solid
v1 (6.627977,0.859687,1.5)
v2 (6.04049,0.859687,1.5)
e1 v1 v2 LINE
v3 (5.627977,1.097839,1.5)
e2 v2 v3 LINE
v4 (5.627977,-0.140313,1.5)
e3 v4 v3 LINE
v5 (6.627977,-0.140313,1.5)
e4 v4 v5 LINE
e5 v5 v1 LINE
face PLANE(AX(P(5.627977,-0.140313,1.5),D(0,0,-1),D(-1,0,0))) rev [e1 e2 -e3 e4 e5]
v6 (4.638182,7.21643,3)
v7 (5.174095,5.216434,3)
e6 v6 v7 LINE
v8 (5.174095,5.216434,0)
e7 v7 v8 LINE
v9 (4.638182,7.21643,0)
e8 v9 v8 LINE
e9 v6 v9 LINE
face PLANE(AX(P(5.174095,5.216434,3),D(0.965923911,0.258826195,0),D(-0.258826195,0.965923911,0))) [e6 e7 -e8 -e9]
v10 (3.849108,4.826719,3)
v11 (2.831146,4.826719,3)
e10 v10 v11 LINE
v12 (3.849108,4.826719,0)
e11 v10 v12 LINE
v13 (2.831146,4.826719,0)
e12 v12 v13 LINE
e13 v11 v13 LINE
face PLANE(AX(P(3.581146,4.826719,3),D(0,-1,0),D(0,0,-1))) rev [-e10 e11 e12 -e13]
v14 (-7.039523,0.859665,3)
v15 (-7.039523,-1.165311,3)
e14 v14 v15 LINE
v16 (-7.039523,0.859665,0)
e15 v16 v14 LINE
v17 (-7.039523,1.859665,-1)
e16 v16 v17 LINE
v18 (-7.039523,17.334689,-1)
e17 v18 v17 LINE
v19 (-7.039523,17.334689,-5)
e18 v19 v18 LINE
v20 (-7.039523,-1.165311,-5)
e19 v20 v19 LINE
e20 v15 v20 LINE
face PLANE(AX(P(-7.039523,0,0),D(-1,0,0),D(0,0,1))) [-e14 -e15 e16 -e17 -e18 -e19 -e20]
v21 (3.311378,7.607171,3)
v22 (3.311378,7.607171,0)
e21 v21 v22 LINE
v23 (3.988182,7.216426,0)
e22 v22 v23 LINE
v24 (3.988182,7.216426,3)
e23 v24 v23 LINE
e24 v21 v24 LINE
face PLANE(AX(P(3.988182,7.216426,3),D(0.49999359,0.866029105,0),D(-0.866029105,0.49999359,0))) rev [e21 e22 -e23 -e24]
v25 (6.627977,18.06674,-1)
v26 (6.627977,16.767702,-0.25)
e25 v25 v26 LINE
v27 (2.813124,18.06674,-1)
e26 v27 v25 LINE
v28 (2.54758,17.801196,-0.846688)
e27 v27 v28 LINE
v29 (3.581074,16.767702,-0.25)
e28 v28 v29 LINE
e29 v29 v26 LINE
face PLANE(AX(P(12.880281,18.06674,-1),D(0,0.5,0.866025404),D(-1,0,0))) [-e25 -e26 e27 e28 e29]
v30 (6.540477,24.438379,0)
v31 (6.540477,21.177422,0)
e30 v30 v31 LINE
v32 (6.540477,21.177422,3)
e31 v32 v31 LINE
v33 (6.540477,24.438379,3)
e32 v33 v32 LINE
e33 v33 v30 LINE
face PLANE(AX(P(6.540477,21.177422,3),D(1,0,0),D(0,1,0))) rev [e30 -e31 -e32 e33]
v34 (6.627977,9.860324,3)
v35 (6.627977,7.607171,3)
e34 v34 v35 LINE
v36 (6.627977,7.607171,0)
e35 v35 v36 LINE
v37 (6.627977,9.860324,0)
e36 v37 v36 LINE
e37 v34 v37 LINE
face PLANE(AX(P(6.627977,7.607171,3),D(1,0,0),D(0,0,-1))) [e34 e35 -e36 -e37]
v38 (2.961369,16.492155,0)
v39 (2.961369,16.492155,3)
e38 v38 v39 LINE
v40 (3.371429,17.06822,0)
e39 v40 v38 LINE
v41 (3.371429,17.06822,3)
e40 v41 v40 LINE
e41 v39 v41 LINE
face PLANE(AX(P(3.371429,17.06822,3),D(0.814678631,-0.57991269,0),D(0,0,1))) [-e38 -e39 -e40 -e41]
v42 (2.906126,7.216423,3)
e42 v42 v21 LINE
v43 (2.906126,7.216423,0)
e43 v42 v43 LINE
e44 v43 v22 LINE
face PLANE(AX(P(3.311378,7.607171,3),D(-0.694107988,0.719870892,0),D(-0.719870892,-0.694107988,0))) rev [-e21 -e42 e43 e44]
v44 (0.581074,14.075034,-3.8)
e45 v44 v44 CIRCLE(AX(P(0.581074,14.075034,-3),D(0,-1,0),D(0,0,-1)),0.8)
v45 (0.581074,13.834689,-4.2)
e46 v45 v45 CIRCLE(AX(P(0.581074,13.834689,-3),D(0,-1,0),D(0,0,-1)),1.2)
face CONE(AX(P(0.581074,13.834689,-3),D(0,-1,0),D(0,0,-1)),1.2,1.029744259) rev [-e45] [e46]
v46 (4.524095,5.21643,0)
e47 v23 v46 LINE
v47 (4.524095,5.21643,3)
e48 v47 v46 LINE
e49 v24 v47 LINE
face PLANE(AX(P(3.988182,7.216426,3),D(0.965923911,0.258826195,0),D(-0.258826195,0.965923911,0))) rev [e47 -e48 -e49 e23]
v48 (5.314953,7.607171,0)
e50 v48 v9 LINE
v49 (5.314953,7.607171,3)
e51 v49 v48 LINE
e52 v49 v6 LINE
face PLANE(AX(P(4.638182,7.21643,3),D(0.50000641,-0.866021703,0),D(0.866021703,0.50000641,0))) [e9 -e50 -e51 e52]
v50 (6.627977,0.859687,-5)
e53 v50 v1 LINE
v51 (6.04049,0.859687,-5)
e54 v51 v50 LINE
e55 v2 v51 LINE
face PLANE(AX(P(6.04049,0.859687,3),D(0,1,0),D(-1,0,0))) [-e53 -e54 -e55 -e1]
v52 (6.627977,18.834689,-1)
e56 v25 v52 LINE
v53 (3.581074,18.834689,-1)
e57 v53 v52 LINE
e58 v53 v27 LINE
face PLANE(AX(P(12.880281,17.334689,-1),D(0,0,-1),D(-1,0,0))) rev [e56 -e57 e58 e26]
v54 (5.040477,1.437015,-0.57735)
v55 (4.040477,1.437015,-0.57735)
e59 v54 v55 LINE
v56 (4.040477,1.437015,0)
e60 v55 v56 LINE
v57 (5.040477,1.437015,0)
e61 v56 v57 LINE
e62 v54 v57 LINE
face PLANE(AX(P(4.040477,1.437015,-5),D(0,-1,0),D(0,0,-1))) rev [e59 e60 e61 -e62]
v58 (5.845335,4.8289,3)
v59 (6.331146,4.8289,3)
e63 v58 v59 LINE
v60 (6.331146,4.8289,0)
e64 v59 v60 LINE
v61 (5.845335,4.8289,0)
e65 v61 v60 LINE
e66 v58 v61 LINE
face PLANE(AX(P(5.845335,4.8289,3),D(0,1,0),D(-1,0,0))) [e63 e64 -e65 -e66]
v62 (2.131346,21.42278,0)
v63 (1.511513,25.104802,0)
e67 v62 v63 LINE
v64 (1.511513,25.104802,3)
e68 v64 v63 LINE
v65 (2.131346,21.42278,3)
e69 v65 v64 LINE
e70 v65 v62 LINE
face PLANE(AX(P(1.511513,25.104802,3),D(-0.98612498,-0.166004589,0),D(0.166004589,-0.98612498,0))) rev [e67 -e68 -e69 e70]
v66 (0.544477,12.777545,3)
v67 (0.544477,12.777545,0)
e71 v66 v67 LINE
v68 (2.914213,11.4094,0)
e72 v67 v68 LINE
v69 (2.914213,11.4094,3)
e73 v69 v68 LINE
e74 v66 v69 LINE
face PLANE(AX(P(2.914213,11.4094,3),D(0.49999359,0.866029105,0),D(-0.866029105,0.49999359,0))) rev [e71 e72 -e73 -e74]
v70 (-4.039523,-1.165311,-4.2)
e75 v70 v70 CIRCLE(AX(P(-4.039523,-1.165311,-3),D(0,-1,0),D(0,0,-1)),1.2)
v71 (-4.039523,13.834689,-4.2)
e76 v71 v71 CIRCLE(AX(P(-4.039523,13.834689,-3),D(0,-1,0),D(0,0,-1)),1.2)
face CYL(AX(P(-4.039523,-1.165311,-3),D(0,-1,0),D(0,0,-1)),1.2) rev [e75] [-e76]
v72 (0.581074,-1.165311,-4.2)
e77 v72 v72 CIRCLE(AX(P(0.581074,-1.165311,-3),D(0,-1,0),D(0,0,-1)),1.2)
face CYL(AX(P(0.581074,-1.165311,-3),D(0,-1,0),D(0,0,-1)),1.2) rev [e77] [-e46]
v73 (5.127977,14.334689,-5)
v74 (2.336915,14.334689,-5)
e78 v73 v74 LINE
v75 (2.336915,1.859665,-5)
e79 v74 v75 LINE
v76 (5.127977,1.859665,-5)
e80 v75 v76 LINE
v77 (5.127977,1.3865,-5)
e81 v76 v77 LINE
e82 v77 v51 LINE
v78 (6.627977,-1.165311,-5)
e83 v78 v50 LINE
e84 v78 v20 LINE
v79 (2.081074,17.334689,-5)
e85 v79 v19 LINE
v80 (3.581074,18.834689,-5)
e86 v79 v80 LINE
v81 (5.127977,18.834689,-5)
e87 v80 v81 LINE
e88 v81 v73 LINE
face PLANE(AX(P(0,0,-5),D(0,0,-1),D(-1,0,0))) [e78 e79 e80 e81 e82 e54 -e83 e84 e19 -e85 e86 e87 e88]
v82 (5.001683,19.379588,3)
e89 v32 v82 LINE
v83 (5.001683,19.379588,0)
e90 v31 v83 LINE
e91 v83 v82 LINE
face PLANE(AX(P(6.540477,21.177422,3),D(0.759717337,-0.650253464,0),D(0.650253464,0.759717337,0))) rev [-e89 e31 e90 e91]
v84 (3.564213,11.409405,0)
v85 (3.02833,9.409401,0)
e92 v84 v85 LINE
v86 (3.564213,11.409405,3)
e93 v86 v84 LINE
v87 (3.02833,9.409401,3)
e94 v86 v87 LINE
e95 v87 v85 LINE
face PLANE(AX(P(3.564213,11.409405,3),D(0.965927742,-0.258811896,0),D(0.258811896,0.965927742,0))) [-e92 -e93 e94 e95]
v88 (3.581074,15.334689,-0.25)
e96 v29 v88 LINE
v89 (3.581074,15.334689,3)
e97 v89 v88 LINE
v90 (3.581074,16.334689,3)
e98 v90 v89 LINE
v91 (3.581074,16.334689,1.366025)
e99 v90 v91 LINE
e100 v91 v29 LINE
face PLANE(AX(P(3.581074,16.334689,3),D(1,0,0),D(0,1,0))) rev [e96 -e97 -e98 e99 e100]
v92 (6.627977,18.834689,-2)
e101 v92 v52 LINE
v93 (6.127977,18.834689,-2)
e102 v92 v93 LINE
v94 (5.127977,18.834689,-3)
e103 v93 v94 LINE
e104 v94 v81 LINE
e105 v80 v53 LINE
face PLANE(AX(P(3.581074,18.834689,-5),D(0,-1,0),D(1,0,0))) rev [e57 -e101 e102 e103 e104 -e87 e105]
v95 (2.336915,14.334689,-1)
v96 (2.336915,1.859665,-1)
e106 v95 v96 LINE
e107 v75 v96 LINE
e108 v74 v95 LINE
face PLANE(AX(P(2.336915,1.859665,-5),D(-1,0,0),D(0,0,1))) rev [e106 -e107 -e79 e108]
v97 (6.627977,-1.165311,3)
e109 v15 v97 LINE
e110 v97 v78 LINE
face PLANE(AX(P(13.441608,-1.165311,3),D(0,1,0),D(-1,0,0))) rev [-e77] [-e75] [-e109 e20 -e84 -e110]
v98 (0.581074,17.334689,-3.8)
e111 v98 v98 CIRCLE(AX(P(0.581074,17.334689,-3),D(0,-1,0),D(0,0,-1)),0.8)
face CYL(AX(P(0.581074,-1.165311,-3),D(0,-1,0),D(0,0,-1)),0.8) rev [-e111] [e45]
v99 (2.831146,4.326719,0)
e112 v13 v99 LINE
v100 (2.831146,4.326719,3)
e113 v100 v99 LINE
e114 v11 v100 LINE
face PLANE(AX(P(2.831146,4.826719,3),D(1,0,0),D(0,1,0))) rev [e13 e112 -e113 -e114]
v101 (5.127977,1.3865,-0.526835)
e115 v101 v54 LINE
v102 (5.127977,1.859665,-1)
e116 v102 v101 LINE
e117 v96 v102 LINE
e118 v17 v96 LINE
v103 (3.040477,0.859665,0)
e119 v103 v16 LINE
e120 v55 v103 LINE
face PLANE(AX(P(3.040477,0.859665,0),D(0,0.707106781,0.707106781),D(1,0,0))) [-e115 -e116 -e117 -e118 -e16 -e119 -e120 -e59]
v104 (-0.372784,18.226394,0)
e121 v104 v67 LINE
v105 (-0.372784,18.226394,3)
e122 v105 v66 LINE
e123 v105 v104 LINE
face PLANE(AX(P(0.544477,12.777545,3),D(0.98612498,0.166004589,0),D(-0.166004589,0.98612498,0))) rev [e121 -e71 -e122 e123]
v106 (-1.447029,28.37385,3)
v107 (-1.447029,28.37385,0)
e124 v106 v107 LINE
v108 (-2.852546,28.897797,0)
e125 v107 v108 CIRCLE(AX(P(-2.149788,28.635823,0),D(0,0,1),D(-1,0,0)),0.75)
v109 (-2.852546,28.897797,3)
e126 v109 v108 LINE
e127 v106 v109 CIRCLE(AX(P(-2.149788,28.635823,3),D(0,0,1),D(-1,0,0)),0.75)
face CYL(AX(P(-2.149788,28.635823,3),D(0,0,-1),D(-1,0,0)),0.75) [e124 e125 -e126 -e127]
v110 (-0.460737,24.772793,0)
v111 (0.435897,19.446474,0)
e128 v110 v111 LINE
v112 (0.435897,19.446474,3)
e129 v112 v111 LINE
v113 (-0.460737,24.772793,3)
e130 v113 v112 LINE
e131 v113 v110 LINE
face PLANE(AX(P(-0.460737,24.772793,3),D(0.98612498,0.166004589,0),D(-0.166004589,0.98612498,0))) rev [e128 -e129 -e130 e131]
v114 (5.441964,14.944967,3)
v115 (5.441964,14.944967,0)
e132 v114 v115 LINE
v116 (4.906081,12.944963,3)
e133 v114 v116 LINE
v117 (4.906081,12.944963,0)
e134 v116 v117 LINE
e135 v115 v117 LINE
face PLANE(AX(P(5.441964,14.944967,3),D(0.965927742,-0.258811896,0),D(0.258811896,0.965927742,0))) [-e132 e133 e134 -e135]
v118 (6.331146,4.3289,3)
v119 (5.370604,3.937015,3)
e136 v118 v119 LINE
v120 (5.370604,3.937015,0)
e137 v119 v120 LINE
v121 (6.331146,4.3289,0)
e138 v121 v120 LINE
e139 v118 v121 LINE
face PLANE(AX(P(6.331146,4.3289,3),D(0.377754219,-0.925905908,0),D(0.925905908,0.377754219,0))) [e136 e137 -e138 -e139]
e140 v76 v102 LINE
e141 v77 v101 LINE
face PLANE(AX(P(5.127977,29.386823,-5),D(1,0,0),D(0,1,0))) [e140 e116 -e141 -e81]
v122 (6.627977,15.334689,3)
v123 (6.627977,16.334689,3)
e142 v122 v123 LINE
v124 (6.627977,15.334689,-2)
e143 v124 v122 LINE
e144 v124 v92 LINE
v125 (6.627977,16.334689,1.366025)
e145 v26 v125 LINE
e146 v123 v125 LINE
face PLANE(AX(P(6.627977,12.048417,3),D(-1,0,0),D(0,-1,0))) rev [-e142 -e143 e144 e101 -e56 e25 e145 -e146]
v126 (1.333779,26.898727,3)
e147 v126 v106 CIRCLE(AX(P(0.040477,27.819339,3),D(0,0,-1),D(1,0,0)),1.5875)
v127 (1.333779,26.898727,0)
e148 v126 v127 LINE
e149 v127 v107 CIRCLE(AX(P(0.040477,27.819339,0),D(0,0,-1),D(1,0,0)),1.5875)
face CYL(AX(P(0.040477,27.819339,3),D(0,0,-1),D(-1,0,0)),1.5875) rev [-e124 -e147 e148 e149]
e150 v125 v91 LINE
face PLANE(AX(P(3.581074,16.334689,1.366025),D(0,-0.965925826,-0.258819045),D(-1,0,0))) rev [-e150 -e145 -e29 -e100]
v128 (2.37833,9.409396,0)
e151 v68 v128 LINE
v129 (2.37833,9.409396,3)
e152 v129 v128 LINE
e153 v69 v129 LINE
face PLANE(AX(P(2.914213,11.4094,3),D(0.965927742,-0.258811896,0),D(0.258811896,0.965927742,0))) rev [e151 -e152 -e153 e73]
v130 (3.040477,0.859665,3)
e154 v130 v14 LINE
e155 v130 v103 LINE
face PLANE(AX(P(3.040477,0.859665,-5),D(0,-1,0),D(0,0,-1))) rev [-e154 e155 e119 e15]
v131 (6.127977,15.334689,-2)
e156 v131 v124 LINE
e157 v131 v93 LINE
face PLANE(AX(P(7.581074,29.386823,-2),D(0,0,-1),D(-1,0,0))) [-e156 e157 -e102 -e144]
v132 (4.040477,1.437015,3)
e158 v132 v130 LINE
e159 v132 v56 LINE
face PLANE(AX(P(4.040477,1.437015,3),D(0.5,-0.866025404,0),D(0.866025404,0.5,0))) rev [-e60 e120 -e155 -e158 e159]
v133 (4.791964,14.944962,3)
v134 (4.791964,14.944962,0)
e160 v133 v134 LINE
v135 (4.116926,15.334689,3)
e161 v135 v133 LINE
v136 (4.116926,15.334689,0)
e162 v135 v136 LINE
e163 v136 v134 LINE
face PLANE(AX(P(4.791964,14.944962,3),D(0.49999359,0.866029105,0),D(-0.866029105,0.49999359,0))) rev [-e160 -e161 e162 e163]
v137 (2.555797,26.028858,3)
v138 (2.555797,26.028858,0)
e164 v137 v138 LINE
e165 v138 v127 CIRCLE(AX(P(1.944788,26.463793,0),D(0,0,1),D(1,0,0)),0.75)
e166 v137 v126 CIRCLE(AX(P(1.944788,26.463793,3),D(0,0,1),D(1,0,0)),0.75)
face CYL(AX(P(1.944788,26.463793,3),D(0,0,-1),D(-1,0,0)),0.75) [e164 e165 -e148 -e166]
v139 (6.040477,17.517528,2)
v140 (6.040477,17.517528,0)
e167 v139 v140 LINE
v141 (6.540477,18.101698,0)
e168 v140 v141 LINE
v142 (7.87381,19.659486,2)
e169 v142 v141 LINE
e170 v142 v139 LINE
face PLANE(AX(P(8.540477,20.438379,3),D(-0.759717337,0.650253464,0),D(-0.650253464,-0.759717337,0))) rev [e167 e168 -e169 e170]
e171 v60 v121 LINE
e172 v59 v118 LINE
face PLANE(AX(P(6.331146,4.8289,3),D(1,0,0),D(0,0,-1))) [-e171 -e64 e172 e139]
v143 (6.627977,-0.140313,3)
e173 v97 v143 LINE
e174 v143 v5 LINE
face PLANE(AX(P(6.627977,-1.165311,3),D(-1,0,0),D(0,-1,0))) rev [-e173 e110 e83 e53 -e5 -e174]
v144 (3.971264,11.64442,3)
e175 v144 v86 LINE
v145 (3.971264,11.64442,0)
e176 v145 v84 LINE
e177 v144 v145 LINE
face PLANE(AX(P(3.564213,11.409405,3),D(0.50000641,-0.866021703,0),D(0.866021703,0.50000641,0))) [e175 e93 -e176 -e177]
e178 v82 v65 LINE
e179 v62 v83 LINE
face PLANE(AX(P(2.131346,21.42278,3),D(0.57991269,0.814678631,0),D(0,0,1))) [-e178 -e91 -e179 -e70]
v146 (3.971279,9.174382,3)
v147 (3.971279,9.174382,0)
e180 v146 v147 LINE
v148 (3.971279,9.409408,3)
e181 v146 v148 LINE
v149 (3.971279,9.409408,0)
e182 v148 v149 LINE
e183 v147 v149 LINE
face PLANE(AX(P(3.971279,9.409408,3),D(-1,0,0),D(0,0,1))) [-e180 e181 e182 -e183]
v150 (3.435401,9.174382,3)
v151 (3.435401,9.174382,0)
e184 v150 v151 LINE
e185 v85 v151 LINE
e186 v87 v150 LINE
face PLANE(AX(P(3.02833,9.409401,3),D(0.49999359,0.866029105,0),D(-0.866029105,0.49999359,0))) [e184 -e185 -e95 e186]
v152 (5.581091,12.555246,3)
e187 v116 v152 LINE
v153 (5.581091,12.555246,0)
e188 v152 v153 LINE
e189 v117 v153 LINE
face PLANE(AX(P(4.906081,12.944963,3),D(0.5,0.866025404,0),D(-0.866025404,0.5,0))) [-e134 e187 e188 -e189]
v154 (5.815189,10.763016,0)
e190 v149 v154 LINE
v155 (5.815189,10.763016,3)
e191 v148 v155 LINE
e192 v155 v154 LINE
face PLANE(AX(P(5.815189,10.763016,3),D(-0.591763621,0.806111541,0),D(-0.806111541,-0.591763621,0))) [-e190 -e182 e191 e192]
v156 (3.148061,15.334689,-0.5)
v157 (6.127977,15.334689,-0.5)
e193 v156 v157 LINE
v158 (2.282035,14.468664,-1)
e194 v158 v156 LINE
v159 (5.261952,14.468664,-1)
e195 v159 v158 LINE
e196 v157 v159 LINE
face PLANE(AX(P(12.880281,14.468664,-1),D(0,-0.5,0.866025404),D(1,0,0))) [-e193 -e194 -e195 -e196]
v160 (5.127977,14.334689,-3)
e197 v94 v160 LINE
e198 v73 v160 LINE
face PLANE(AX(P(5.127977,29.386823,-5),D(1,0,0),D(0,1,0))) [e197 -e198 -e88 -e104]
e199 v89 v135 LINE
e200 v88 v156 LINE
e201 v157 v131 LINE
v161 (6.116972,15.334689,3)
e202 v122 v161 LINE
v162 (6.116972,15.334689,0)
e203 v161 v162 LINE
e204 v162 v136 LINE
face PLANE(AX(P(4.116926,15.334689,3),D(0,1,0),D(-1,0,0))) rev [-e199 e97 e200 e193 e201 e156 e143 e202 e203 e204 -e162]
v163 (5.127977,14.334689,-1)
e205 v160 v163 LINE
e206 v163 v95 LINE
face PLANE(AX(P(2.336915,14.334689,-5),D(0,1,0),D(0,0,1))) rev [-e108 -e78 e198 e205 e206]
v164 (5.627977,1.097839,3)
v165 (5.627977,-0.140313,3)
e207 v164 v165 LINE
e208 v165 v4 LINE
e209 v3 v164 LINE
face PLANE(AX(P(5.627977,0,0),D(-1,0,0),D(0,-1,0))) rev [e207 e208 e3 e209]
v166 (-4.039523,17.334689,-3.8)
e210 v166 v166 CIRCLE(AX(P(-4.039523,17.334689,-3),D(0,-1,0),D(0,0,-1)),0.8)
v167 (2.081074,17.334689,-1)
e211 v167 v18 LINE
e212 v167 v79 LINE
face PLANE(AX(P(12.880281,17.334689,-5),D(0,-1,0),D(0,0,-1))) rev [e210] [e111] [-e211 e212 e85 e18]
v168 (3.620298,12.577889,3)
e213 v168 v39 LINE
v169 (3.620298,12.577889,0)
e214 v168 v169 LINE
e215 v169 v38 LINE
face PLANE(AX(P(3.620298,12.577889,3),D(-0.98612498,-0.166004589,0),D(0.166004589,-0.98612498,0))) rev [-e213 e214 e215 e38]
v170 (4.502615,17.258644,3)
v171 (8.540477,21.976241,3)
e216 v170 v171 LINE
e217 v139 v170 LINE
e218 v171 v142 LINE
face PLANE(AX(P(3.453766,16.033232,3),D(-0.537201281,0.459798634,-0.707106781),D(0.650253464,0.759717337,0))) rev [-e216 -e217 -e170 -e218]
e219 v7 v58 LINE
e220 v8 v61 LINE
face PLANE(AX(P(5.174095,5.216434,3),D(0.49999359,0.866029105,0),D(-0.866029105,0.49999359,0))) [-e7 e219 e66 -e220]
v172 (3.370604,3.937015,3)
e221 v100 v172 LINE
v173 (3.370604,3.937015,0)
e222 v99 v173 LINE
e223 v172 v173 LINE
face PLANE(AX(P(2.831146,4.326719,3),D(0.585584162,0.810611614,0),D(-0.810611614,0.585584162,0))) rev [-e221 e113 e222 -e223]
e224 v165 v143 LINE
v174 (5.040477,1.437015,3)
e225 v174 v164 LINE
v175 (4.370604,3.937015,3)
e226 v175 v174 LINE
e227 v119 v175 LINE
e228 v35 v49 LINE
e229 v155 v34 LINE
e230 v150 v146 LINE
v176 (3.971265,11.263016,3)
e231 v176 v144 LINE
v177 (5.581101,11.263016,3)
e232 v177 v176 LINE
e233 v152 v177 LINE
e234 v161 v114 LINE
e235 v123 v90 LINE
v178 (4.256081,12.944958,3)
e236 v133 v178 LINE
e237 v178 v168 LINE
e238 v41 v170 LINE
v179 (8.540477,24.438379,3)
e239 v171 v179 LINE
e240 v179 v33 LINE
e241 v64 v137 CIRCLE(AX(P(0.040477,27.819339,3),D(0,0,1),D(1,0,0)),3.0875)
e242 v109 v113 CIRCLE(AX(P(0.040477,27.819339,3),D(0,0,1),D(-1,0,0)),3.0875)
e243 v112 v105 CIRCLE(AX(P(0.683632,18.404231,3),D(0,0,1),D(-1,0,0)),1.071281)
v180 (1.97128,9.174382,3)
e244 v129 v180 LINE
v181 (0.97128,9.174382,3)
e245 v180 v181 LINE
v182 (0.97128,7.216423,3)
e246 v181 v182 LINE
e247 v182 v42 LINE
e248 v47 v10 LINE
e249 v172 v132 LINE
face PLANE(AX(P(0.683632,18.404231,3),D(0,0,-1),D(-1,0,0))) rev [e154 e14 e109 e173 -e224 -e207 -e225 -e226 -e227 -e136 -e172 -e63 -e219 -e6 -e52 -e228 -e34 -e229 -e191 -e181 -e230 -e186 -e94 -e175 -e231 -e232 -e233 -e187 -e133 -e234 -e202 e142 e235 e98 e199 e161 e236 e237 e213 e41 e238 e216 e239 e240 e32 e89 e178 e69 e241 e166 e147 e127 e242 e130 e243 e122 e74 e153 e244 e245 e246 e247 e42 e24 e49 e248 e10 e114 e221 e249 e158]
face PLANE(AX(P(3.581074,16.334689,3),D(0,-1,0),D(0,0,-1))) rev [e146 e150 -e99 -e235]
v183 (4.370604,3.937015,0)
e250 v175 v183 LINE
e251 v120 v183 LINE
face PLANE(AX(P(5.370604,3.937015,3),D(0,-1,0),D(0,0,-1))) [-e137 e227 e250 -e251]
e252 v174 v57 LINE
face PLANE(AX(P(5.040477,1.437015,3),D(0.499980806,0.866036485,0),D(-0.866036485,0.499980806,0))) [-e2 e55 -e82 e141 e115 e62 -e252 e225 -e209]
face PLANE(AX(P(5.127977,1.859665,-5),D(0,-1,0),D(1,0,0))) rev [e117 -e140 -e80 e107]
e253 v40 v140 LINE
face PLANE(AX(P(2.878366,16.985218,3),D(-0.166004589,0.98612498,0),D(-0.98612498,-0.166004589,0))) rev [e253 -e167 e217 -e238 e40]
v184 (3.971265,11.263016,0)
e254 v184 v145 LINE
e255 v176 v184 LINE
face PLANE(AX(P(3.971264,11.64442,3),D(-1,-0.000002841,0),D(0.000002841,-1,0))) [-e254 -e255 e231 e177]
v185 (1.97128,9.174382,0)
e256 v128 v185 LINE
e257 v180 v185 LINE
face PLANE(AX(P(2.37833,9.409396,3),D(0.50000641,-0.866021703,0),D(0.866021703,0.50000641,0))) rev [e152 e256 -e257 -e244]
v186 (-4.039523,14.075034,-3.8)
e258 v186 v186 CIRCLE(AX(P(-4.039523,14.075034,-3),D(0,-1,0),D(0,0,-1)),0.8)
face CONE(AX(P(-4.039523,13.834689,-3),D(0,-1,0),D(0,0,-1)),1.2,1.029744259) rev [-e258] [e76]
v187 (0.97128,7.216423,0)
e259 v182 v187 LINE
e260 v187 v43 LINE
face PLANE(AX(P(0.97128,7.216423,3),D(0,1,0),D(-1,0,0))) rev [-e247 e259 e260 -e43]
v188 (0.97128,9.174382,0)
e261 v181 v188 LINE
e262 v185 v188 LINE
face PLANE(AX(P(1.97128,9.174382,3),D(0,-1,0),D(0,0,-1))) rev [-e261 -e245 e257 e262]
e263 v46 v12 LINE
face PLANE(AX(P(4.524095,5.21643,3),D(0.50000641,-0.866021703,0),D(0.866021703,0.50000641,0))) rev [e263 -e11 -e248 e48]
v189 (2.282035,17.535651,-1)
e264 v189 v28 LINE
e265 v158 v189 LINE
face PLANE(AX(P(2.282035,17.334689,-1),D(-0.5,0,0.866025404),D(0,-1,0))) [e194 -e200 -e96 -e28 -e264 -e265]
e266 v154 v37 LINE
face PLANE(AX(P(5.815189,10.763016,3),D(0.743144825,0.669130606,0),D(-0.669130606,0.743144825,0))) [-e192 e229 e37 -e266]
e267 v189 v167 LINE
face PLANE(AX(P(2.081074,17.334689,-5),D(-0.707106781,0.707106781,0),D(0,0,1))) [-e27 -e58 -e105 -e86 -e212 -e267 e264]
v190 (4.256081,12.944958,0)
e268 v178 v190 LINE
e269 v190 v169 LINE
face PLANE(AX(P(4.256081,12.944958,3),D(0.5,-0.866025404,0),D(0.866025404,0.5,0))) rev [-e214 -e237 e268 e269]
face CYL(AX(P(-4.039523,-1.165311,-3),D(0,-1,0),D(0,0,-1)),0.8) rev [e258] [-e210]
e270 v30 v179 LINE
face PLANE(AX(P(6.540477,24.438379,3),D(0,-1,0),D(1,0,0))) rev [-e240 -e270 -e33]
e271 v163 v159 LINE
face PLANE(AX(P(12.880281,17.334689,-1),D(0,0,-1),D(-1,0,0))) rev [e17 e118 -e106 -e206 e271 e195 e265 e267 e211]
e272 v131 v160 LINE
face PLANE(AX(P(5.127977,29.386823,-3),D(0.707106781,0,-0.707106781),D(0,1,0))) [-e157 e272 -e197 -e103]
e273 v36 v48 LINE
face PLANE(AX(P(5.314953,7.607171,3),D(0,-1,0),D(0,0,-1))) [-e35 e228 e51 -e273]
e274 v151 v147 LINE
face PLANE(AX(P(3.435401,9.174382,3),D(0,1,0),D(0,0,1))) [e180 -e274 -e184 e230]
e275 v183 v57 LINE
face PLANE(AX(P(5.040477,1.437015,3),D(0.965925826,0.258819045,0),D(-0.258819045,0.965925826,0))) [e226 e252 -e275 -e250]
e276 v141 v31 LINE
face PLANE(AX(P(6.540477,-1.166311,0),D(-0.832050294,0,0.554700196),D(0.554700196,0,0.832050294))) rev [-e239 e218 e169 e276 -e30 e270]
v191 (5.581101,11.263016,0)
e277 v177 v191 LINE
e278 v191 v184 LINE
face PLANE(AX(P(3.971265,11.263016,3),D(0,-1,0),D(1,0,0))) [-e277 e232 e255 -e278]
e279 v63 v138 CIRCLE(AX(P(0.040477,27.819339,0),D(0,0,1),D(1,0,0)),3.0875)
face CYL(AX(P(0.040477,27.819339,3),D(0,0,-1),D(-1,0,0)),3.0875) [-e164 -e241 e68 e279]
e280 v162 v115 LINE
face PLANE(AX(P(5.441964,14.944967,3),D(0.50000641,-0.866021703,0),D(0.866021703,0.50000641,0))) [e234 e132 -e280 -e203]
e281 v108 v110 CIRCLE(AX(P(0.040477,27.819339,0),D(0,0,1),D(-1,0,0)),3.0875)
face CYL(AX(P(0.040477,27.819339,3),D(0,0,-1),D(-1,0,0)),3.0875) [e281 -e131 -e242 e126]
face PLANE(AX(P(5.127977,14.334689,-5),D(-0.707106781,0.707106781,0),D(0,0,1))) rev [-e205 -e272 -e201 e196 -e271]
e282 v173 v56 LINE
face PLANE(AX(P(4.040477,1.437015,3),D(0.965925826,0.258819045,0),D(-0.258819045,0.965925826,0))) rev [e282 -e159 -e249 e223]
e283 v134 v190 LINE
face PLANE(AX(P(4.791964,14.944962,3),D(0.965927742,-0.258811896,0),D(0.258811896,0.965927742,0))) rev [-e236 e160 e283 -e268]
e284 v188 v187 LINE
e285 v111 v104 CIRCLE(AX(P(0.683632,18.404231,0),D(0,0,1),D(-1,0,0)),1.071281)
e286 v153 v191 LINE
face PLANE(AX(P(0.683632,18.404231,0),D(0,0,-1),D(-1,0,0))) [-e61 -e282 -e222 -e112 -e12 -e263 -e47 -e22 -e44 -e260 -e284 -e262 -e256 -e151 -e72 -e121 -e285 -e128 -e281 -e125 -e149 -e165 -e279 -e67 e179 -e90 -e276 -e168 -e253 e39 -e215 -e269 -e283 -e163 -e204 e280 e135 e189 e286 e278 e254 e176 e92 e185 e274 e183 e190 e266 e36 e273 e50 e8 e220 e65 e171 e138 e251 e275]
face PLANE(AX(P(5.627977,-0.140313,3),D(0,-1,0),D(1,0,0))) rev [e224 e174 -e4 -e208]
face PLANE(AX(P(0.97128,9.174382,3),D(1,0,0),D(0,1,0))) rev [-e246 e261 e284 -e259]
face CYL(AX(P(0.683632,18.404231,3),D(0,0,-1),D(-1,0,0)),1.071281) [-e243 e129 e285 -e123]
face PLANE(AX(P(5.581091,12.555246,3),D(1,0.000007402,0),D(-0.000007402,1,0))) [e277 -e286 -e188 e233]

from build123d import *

# Parameters (mm, degrees)
BOSS_SWITCH_BODY_DEPTH                         = 3
SKETCH1_W                                      = 4
SKETCH1_H                                      = 3.5
BOSS_FLANGE_WIDTH_DEPTH                        = 5
BOSS_FLANGE_HEIGHT_REACH                       = 38.166
SKETCH2_W                                      = 4
SKETCH2_H                                      = 2
SKETCH2_W_2                                    = 8
SKETCH2_H_2                                    = 2.024975669
CUT_UP_TO_DOWN_DERAILLEUR_CLEARANCE_REACH      = 23.862
SKETCH10_W                                     = 2.453096586
SKETCH10_H                                     = 3
SKETCH17_W                                     = 12.1675
SKETCH17_H                                     = 4
BOSS_FLANGE_SUPPORT_DEPTH                      = 14.475024331
TAP_DRILL_FOR_M2X0_4_TAP1_D                    = 1.6
M2_CLEARANCE_HOLE2_D                           = 2.4
M2_CLEARANCE_HOLE2_DEPTH                       = 15
M2_CLEARANCE_HOLE2_TIP                         = 0.721032743
CUT_UP_TO_DOWN_CANTILEVER_SLOPE_REACH          = 31.347
CUT_DOWN_TO_UP_DERAILLEUR_CLEARANCE_DEPTH      = 33.69867621
CUT_DOWN_TO_UP_DERAILLEUR_CLEARANCE_DEPTH_BACK = 33.69867621
CHAMFER_FLANGE_SUPPORT_SIZE                    = 1.5
CHAMFER_FLANGE_SUPPORT_2_SIZE                  = 1
CHAMFER_FLANGE_SUPPORT_3_SIZE                  = 1
SKETCH18_W                                     = 1.5
SKETCH18_H                                     = 1.577328106
CUT_DOWN_TO_UP_DERAILLEUR_CLEARANCE_2_DEPTH    = 1
SKETCH19_W                                     = 3.046903414
SKETCH19_H                                     = 2.563581512
CUT_UP_TO_DOWN_CANTILEVER_CLEARANCE_DEPTH      = 1
CHAMFER1_SIZE                                  = 1
CHAMFER1_SIZE_2                                = 1.732050808
CHAMFER3_SIZE                                  = 0.75
CHAMFER3_SIZE_2                                = 1.299038106
CHAMFER4_SIZE                                  = 0.866025404
CHAMFER4_SIZE2                                 = 0.5
CHAMFER5_SIZE                                  = 0.5
CHAMFER6_SIZE                                  = 2.5
CHAMFER7_SIZE                                  = 1
CUT_EXTRUDE3_REACH                             = 33.008
CHAMFER8_SIZE                                  = 0.5
CHAMFER8_SIZE2                                 = 1.366025404
SKETCH23_W                                     = 2.791062273
SKETCH23_H                                     = 12.475024331
CUT_EXTRUDE4_DEPTH                             = 31.862053717


# Some blends are built 0.0001 mm under size
with BuildPart() as part:
    # Sketch-SwitchBossUp → Boss-Switch Body (new body)
    with BuildSketch(Plane.XY):
        with BuildLine():
            Line((6.540476927, 21.177422148), (6.540476927, 24.438379064))
            Line((6.540476927, 24.438379064), (8.540476927, 24.438379064))
            Line((8.540476927, 24.438379064), (8.540476927, 20.438379064))
            Line((8.540476927, 20.438379064), (6.040476927, 17.517528279))
            Line((6.040476927, 17.517528279), (2.878366495, 16.985217616))
            Line((2.878366495, 16.985217616), (3.620297651, 12.577888564))
            Line((3.620297651, 12.577888564), (4.256080915, 12.944958203))
            Line((4.256080915, 12.944958203), (4.791964496, 14.944962169))
            Line((4.791964496, 14.944962169), (4.116925685, 15.334689347))
            Line((4.116925685, 15.334689347), (3.581073513, 15.334689347))
            Line((3.581073513, 15.334689347), (3.581073513, 16.334689347))
            Line((3.581073513, 16.334689347), (6.857327822, 16.334689347))
            Line((6.857327822, 16.334689347), (13.441607507, 16.334689347))
            Line((13.441607507, 16.334689347), (13.441607507, -1.165310653))
            Line((13.441607507, -1.165310653), (5.040476927, -1.165310653))
            Line((5.040476927, -1.165310653), (3.040476927, -1.165310653))
            Line((3.040476927, -1.165310653), (3.040476927, 0.859665016))
            Line((3.040476927, 0.859665016), (4.040476927, 1.437015286))
            Line((4.040476927, 1.437015286), (3.370603946, 3.937015286))
            Line((3.370603946, 3.937015286), (2.83114552, 4.326718942))
            Line((2.83114552, 4.326718942), (2.83114552, 4.826718942))
            Line((2.83114552, 4.826718942), (3.58114552, 4.826718942))
            Line((3.58114552, 4.826718942), (3.849107629, 4.826718942))
            Line((3.849107629, 4.826718942), (4.524094713, 5.216429578))
            Line((4.524094713, 5.216429578), (3.988181525, 7.216425611))
            Line((3.988181525, 7.216425611), (3.311378308, 7.607171452))
            Line((3.311378308, 7.607171452), (2.9061262, 7.216422599))
            Line((2.9061262, 7.216422599), (0.971280482, 7.216422599))
            Line((0.971280482, 7.216422599), (0.971280482, 9.174382361))
            Line((0.971280482, 9.174382361), (1.971280482, 9.174382361))
            Line((1.971280482, 9.174382361), (2.378329551, 9.409396267))
            Line((2.378329551, 9.409396267), (2.914213132, 11.409400234))
            Line((2.914213132, 11.409400234), (0.544476723, 12.777544801))
            Line((0.544476723, 12.777544801), (-0.372784255, 18.226393961))
            ThreePointArc((-0.372784255, 18.226393961), (-0.209313172, 18.996084896), (0.435897335, 19.446473985))
            Line((0.435897335, 19.446473985), (-0.46073685, 24.772792819))
            ThreePointArc((-0.46073685, 24.772792819), (-2.630501593, 26.270619745), (-2.852546321, 28.897797067))
            ThreePointArc((-2.852546321, 28.897797067), (-1.887813913, 29.338582026), (-1.447028953, 28.373849618))
            ThreePointArc((-1.447028953, 28.373849618), (-0.703448682, 26.416936722), (1.333779254, 26.898727173))
            ThreePointArc((1.333779254, 26.898727173), (2.379722745, 27.074801628), (2.555797201, 26.028858137))
            ThreePointArc((2.555797201, 26.028858137), (2.086504637, 25.507104397), (1.511513111, 25.104801997))
            Line((1.511513111, 25.104801997), (2.546357317, 18.957467576))
            Line((2.546357317, 18.957467576), (4.992893704, 19.36931828))
            Line((4.992893704, 19.36931828), (6.540476927, 21.177422148))
        make_face()
        Polygon((5.581091201, 12.555245643), (5.581100766, 11.263016278), (3.971265023, 11.263016278), (3.97126394, 11.644419955), (3.564213132, 11.409405045), (3.028329551, 9.409401078), (3.435400868, 9.174382361), (3.971278743, 9.174382361), (3.971278743, 9.409408058), (5.815189335, 10.763016278), (6.627976927, 9.860324206), (6.627976927, 8.365258971), (6.627976927, 7.607171452), (5.314953271, 7.607171452), (4.638181525, 7.216430422), (5.174094713, 5.216434389), (5.845334952, 4.828900281), (6.33114552, 4.828900281), (6.33114552, 4.328900281), (5.370603946, 3.937015286), (4.370603946, 3.937015286), (5.040476927, 1.437015286), (6.040489723, 0.85968718), (9.127976927, 0.85968718), (10.437466736, 2.169176988), (10.437466736, 14.025199539), (9.127976927, 15.334689347), (6.116971898, 15.334689347), (5.441964496, 14.94496698), (4.906080915, 12.944963014), align=None, mode=Mode.SUBTRACT)
    extrude(amount=BOSS_SWITCH_BODY_DEPTH)

    # Sketch1 → Boss-Flange Width (add)
    with BuildSketch(Plane(origin=(0, 0, 0), x_dir=(-1, 0, 0), z_dir=(0, 0, -1))):
        Polygon((-7.581073513, -1.165310653), (0.412170615, -1.165310653), (0.412170615, 0.859665016), (-3.040476927, 0.859665016), (-4.040476927, 1.437015286), (-5.040476927, 1.437015286), (-6.040489723, 0.85968718), (-7.581073513, 0.85968718), align=None)
        with Locations((-5.581073513, 17.084689347)):
            Rectangle(SKETCH1_W, SKETCH1_H)
    extrude(amount=BOSS_FLANGE_WIDTH_DEPTH)

    # Sketch2 → Boss-Flange Height (add, up to next)
    with BuildSketch(Plane(origin=(-7.039523073, 0, 0), x_dir=(0, 0, -1), z_dir=(1, 0, 0)), mode=Mode.PRIVATE) as boss_flange_height_sk1:
        with Locations((3, 16.334689347)):
            Rectangle(SKETCH2_W, SKETCH2_H)
    boss_flange_height_tool1 = extrude(boss_flange_height_sk1.sketch, amount=BOSS_FLANGE_HEIGHT_REACH, mode=Mode.PRIVATE) - part.part
    # Sketch2 → Boss-Flange Height (add, up to next)
    with BuildSketch(Plane(origin=(-7.039523073, 0, 0), x_dir=(0, 0, -1), z_dir=(1, 0, 0)), mode=Mode.PRIVATE) as boss_flange_height_sk2:
        with Locations((1, -0.152822819)):
            Rectangle(SKETCH2_W_2, SKETCH2_H_2)
    boss_flange_height_tool2 = extrude(boss_flange_height_sk2.sketch, amount=BOSS_FLANGE_HEIGHT_REACH, mode=Mode.PRIVATE) - part.part
    add(boss_flange_height_tool1.solids().sort_by_distance((-7.039523, 16.334689, -3))[0])
    add(boss_flange_height_tool2.solids().sort_by_distance((-7.039523, -0.152823, -1))[0])

    # Sketch10 → Cut-Up-To-Down Derailleur Clearance (cut, up to next)
    with BuildSketch(Plane(origin=(0, 15.334689347, 0), x_dir=(1, 0, 0), z_dir=(0, 1, 0)), mode=Mode.PRIVATE) as cut_up_to_down_derailleur_clearance_sk1:
        with Locations((6.35452522, 3.5)):
            Rectangle(SKETCH10_W, SKETCH10_H)
    cut_up_to_down_derailleur_clearance_tool1 = extrude(cut_up_to_down_derailleur_clearance_sk1.sketch, amount=CUT_UP_TO_DOWN_DERAILLEUR_CLEARANCE_REACH, mode=Mode.PRIVATE) & part.part
    add(cut_up_to_down_derailleur_clearance_tool1.solids().sort_by_distance((6.354525, 15.334689, -3.5))[0], mode=Mode.SUBTRACT)

    # Sketch17 → Boss-Flange Support (add)
    with BuildSketch(Plane.XZ.offset(-15.334689347)):
        with Locations((-0.955773073, -3)):
            Rectangle(SKETCH17_W, SKETCH17_H)
    extrude(amount=BOSS_FLANGE_SUPPORT_DEPTH)

    # Tap Drill for M2x0.4 Tap1 (through all)
    with Locations(Plane(origin=(0, -1.165310653, 0), x_dir=(-1, 0, 0), z_dir=(0, -1, 0))):
        with Locations((4.039523073, 3), (-0.581073513, 3)):
            Hole(TAP_DRILL_FOR_M2X0_4_TAP1_D / 2)

    # M2 Clearance Hole2
    with Locations(Plane.XZ.offset(1.165310653)):
        with Locations((-4.039523073, -3), (0.581073513, -3)):
            Hole(M2_CLEARANCE_HOLE2_D / 2, depth=M2_CLEARANCE_HOLE2_DEPTH)
            with Locations((0, 0, -(M2_CLEARANCE_HOLE2_DEPTH + M2_CLEARANCE_HOLE2_TIP / 2))):  # 118° drill point
                Cone(0, M2_CLEARANCE_HOLE2_D / 2, M2_CLEARANCE_HOLE2_TIP, mode=Mode.SUBTRACT)

    # Sketch12 → Cut-Up-to-Down Cantilever Slope (cut, up to next)
    with BuildSketch(Plane(origin=(0, 24.438379064, 0), x_dir=(1, 0, 0), z_dir=(0, 1, 0)), mode=Mode.PRIVATE) as cut_up_to_down_cantilever_slope_sk1:
        Polygon((6.540476927, 0), (8.540476927, -3), (8.540476927, 0), align=None)
    cut_up_to_down_cantilever_slope_tool1 = extrude(cut_up_to_down_cantilever_slope_sk1.sketch, amount=-CUT_UP_TO_DOWN_CANTILEVER_SLOPE_REACH, mode=Mode.PRIVATE) & part.part
    add(cut_up_to_down_cantilever_slope_tool1.solids().sort_by_distance((7.87381, 24.438379, 1))[0], mode=Mode.SUBTRACT)

    # Sketch16 → Cut-Down-to-Up Derailleur Clearance (cut, two sides: drawn at the far end of the back side and taken through both)
    with BuildSketch(Plane(origin=(0, 0, 0), x_dir=(-1, 0, 0), z_dir=(0, 0, -1)).offset(-CUT_DOWN_TO_UP_DERAILLEUR_CLEARANCE_DEPTH_BACK)):
        Polygon((-7.581073513, 18.834689347), (-13.441607507, 18.834689347), (-13.441607507, -1.165310653), (-6.627976927, -1.165310653), (-6.627976927, 5.203794929), (-8.003689255, 5.203794929), (-8.003689255, 12.048417413), (-6.627976927, 12.048417413), (-6.627976927, 17.947659965), align=None)
    extrude(amount=CUT_DOWN_TO_UP_DERAILLEUR_CLEARANCE_DEPTH + CUT_DOWN_TO_UP_DERAILLEUR_CLEARANCE_DEPTH_BACK, mode=Mode.SUBTRACT)

    # Chamfer-Flange Support
    chamfer_flange_support_edges = [part.edges().sort_by_distance(p)[0] for p in [
        (3.581073513, 17.334689347, -3),
    ]]
    chamfer(chamfer_flange_support_edges, length=CHAMFER_FLANGE_SUPPORT_SIZE - 0.0001)  # a hair under: the kernel refuses the full size

    # Chamfer-Flange Support 2
    chamfer_flange_support_2_edges = [part.edges().sort_by_distance(p)[0] for p in [
        (5.127976927, 17.084689347, -2),
        (5.127976927, 15.334689347, -1.5),
    ]]
    chamfer(chamfer_flange_support_2_edges, length=CHAMFER_FLANGE_SUPPORT_2_SIZE)

    # Chamfer-Flange Support 3
    chamfer_flange_support_3_edges = [part.edges().sort_by_distance(p)[0] for p in [
        (-1.999523073, 0.859665016, -1),
    ]]
    chamfer(chamfer_flange_support_3_edges, length=CHAMFER_FLANGE_SUPPORT_3_SIZE)

    # Sketch18 → Cut-Down-to-Up Derailleur Clearance 2 (cut)
    with BuildSketch(Plane(origin=(6.627976927, 0, 0), x_dir=(0, 0, -1), z_dir=(1, 0, 0))):
        with Locations((-2.25, 0.648351233)):
            Rectangle(SKETCH18_W, SKETCH18_H)
    extrude(amount=-CUT_DOWN_TO_UP_DERAILLEUR_CLEARANCE_2_DEPTH, mode=Mode.SUBTRACT)

    # Sketch19 → Cut-Up-to-Down Cantilever Clearance (cut)
    with BuildSketch(Plane.XY):
        with Locations((5.10452522, 17.616480103)):
            Rectangle(SKETCH19_W, SKETCH19_H)
    extrude(amount=-CUT_UP_TO_DOWN_CANTILEVER_CLEARANCE_DEPTH, mode=Mode.SUBTRACT)

    # Chamfer1
    # the kernel refuses this chamfer: 1.732050808, 1 mm, written as the material it adds along each edge
    with BuildSketch(Plane(origin=(6.627976927, 16.334689347, -1), x_dir=(0, -0.05789386240266977, 0.9983227437537926), z_dir=(-1, 0, 0))) as chamfer1_piece_1:
        Polygon((CHAMFER1_SIZE * 0.998322743754, CHAMFER1_SIZE * 0.0578938624027), (-CHAMFER1_SIZE_2 * 0.0578938623883, CHAMFER1_SIZE_2 * 0.998322743505), (0, 0), align=None)
    extrude(amount=3.046903414)

    # Chamfer3
    # the kernel refuses this chamfer: 1.299038106, 0.75 mm, written as the material it adds along each edge
    with BuildSketch(Plane(origin=(3.581073513, 15.334689347, -1), x_dir=(0.05789386240236086, -1.5934376059306423e-13, 0.9983227437538106), z_dir=(0, 1, 0))) as chamfer3_piece_1_section:
        Polygon((CHAMFER3_SIZE * 0.998322743754, -CHAMFER3_SIZE * 0.0578938624027), (-CHAMFER3_SIZE_2 * 0.057893862388, -CHAMFER3_SIZE_2 * 0.998322743505), (0, 0), align=None)
    chamfer3_piece_1 = extrude(amount=6.092773786, mode=Mode.PRIVATE)
    chamfer3_piece_1 = split(chamfer3_piece_1, bisect_by=Plane(origin=(3.127107762, 16.799062109, -0.268105739), z_dir=(0, -0.4999999999999566, -0.8660254037844637)), keep=Keep.TOP, mode=Mode.PRIVATE)
    chamfer3_piece_1 = split(chamfer3_piece_1, bisect_by=Plane(origin=(2.18713947, 17.440655304, -0.784906566), z_dir=(0.7071067811865476, -0.7071067811865476, 0)), keep=Keep.TOP, mode=Mode.PRIVATE)
    add(chamfer3_piece_1)

    # Chamfer4
    chamfer4_edges = [part.edges().sort_by_distance(p)[0] for p in [
        (4.205006167, 15.334689347, -1),
    ]]
    chamfer4_side = [part.faces().sort_by_distance(p)[0] for p in [
        (-1.082771879, 9.403372689, -1),
    ]]
    chamfer(chamfer4_edges, length=CHAMFER4_SIZE, length2=CHAMFER4_SIZE2, reference=chamfer4_side[0])

    # Chamfer5
    chamfer5_edges = [part.edges().sort_by_distance(p)[0] for p in [
        (2.878366495, 16.985217616, 1.5),
    ]]
    chamfer(chamfer5_edges, length=CHAMFER5_SIZE)

    # Chamfer6
    # the kernel refuses this chamfer: 2.5 mm, written as the material it adds along each edge
    with BuildSketch(Plane(origin=(2.546357317, 18.957467576, 0), x_dir=(0.9903165846799726, 0.13882745444541758, 0), z_dir=(0, 0, 1))) as chamfer6_piece_1:
        Polygon((CHAMFER6_SIZE * 0.999621916911, CHAMFER6_SIZE * 0.0274958766106), (-CHAMFER6_SIZE * 0.0274958766106, CHAMFER6_SIZE * 0.999621916911), (0, 0), align=None)
    extrude(amount=3)

    # Chamfer7
    chamfer7_edges = [part.edges().sort_by_distance(p)[0] for p in [
        (7.290476927, 18.977953671, 3),
    ]]
    chamfer(chamfer7_edges, length=CHAMFER7_SIZE)

    # Sketch22 → Cut-Extrude3 (cut, up to next)
    with BuildSketch(Plane.XY, mode=Mode.PRIVATE) as cut_extrude3_sk1:
        Polygon((6.627976927, 17.947659965), (7.581073513, 18.834689347), (6.627976927, 18.834689347), align=None)
    cut_extrude3_tool1 = extrude(cut_extrude3_sk1.sketch, amount=-CUT_EXTRUDE3_REACH, mode=Mode.PRIVATE) & part.part
    add(cut_extrude3_tool1.solids().sort_by_distance((6.945676, 18.539013, 0))[0], mode=Mode.SUBTRACT)

    # Chamfer8
    chamfer8_edges = [part.edges().sort_by_distance(p)[0] for p in [
        (5.10452522, 16.334689347, 0),
    ]]
    chamfer8_side = [part.faces().sort_by_distance(p)[0] for p in [
        (4.861507649, 17.252033573, -0.529628936),
    ]]
    chamfer(chamfer8_edges, length=CHAMFER8_SIZE, length2=CHAMFER8_SIZE2, reference=chamfer8_side[0])

    # Sketch23 → Cut-Extrude4 (cut, through all)
    with BuildSketch(Plane.XY.offset(-1)):
        with Locations((3.732445791, 8.097177182)):
            Rectangle(SKETCH23_W, SKETCH23_H)
    extrude(amount=-CUT_EXTRUDE4_DEPTH, mode=Mode.SUBTRACT)


solid = part.part
